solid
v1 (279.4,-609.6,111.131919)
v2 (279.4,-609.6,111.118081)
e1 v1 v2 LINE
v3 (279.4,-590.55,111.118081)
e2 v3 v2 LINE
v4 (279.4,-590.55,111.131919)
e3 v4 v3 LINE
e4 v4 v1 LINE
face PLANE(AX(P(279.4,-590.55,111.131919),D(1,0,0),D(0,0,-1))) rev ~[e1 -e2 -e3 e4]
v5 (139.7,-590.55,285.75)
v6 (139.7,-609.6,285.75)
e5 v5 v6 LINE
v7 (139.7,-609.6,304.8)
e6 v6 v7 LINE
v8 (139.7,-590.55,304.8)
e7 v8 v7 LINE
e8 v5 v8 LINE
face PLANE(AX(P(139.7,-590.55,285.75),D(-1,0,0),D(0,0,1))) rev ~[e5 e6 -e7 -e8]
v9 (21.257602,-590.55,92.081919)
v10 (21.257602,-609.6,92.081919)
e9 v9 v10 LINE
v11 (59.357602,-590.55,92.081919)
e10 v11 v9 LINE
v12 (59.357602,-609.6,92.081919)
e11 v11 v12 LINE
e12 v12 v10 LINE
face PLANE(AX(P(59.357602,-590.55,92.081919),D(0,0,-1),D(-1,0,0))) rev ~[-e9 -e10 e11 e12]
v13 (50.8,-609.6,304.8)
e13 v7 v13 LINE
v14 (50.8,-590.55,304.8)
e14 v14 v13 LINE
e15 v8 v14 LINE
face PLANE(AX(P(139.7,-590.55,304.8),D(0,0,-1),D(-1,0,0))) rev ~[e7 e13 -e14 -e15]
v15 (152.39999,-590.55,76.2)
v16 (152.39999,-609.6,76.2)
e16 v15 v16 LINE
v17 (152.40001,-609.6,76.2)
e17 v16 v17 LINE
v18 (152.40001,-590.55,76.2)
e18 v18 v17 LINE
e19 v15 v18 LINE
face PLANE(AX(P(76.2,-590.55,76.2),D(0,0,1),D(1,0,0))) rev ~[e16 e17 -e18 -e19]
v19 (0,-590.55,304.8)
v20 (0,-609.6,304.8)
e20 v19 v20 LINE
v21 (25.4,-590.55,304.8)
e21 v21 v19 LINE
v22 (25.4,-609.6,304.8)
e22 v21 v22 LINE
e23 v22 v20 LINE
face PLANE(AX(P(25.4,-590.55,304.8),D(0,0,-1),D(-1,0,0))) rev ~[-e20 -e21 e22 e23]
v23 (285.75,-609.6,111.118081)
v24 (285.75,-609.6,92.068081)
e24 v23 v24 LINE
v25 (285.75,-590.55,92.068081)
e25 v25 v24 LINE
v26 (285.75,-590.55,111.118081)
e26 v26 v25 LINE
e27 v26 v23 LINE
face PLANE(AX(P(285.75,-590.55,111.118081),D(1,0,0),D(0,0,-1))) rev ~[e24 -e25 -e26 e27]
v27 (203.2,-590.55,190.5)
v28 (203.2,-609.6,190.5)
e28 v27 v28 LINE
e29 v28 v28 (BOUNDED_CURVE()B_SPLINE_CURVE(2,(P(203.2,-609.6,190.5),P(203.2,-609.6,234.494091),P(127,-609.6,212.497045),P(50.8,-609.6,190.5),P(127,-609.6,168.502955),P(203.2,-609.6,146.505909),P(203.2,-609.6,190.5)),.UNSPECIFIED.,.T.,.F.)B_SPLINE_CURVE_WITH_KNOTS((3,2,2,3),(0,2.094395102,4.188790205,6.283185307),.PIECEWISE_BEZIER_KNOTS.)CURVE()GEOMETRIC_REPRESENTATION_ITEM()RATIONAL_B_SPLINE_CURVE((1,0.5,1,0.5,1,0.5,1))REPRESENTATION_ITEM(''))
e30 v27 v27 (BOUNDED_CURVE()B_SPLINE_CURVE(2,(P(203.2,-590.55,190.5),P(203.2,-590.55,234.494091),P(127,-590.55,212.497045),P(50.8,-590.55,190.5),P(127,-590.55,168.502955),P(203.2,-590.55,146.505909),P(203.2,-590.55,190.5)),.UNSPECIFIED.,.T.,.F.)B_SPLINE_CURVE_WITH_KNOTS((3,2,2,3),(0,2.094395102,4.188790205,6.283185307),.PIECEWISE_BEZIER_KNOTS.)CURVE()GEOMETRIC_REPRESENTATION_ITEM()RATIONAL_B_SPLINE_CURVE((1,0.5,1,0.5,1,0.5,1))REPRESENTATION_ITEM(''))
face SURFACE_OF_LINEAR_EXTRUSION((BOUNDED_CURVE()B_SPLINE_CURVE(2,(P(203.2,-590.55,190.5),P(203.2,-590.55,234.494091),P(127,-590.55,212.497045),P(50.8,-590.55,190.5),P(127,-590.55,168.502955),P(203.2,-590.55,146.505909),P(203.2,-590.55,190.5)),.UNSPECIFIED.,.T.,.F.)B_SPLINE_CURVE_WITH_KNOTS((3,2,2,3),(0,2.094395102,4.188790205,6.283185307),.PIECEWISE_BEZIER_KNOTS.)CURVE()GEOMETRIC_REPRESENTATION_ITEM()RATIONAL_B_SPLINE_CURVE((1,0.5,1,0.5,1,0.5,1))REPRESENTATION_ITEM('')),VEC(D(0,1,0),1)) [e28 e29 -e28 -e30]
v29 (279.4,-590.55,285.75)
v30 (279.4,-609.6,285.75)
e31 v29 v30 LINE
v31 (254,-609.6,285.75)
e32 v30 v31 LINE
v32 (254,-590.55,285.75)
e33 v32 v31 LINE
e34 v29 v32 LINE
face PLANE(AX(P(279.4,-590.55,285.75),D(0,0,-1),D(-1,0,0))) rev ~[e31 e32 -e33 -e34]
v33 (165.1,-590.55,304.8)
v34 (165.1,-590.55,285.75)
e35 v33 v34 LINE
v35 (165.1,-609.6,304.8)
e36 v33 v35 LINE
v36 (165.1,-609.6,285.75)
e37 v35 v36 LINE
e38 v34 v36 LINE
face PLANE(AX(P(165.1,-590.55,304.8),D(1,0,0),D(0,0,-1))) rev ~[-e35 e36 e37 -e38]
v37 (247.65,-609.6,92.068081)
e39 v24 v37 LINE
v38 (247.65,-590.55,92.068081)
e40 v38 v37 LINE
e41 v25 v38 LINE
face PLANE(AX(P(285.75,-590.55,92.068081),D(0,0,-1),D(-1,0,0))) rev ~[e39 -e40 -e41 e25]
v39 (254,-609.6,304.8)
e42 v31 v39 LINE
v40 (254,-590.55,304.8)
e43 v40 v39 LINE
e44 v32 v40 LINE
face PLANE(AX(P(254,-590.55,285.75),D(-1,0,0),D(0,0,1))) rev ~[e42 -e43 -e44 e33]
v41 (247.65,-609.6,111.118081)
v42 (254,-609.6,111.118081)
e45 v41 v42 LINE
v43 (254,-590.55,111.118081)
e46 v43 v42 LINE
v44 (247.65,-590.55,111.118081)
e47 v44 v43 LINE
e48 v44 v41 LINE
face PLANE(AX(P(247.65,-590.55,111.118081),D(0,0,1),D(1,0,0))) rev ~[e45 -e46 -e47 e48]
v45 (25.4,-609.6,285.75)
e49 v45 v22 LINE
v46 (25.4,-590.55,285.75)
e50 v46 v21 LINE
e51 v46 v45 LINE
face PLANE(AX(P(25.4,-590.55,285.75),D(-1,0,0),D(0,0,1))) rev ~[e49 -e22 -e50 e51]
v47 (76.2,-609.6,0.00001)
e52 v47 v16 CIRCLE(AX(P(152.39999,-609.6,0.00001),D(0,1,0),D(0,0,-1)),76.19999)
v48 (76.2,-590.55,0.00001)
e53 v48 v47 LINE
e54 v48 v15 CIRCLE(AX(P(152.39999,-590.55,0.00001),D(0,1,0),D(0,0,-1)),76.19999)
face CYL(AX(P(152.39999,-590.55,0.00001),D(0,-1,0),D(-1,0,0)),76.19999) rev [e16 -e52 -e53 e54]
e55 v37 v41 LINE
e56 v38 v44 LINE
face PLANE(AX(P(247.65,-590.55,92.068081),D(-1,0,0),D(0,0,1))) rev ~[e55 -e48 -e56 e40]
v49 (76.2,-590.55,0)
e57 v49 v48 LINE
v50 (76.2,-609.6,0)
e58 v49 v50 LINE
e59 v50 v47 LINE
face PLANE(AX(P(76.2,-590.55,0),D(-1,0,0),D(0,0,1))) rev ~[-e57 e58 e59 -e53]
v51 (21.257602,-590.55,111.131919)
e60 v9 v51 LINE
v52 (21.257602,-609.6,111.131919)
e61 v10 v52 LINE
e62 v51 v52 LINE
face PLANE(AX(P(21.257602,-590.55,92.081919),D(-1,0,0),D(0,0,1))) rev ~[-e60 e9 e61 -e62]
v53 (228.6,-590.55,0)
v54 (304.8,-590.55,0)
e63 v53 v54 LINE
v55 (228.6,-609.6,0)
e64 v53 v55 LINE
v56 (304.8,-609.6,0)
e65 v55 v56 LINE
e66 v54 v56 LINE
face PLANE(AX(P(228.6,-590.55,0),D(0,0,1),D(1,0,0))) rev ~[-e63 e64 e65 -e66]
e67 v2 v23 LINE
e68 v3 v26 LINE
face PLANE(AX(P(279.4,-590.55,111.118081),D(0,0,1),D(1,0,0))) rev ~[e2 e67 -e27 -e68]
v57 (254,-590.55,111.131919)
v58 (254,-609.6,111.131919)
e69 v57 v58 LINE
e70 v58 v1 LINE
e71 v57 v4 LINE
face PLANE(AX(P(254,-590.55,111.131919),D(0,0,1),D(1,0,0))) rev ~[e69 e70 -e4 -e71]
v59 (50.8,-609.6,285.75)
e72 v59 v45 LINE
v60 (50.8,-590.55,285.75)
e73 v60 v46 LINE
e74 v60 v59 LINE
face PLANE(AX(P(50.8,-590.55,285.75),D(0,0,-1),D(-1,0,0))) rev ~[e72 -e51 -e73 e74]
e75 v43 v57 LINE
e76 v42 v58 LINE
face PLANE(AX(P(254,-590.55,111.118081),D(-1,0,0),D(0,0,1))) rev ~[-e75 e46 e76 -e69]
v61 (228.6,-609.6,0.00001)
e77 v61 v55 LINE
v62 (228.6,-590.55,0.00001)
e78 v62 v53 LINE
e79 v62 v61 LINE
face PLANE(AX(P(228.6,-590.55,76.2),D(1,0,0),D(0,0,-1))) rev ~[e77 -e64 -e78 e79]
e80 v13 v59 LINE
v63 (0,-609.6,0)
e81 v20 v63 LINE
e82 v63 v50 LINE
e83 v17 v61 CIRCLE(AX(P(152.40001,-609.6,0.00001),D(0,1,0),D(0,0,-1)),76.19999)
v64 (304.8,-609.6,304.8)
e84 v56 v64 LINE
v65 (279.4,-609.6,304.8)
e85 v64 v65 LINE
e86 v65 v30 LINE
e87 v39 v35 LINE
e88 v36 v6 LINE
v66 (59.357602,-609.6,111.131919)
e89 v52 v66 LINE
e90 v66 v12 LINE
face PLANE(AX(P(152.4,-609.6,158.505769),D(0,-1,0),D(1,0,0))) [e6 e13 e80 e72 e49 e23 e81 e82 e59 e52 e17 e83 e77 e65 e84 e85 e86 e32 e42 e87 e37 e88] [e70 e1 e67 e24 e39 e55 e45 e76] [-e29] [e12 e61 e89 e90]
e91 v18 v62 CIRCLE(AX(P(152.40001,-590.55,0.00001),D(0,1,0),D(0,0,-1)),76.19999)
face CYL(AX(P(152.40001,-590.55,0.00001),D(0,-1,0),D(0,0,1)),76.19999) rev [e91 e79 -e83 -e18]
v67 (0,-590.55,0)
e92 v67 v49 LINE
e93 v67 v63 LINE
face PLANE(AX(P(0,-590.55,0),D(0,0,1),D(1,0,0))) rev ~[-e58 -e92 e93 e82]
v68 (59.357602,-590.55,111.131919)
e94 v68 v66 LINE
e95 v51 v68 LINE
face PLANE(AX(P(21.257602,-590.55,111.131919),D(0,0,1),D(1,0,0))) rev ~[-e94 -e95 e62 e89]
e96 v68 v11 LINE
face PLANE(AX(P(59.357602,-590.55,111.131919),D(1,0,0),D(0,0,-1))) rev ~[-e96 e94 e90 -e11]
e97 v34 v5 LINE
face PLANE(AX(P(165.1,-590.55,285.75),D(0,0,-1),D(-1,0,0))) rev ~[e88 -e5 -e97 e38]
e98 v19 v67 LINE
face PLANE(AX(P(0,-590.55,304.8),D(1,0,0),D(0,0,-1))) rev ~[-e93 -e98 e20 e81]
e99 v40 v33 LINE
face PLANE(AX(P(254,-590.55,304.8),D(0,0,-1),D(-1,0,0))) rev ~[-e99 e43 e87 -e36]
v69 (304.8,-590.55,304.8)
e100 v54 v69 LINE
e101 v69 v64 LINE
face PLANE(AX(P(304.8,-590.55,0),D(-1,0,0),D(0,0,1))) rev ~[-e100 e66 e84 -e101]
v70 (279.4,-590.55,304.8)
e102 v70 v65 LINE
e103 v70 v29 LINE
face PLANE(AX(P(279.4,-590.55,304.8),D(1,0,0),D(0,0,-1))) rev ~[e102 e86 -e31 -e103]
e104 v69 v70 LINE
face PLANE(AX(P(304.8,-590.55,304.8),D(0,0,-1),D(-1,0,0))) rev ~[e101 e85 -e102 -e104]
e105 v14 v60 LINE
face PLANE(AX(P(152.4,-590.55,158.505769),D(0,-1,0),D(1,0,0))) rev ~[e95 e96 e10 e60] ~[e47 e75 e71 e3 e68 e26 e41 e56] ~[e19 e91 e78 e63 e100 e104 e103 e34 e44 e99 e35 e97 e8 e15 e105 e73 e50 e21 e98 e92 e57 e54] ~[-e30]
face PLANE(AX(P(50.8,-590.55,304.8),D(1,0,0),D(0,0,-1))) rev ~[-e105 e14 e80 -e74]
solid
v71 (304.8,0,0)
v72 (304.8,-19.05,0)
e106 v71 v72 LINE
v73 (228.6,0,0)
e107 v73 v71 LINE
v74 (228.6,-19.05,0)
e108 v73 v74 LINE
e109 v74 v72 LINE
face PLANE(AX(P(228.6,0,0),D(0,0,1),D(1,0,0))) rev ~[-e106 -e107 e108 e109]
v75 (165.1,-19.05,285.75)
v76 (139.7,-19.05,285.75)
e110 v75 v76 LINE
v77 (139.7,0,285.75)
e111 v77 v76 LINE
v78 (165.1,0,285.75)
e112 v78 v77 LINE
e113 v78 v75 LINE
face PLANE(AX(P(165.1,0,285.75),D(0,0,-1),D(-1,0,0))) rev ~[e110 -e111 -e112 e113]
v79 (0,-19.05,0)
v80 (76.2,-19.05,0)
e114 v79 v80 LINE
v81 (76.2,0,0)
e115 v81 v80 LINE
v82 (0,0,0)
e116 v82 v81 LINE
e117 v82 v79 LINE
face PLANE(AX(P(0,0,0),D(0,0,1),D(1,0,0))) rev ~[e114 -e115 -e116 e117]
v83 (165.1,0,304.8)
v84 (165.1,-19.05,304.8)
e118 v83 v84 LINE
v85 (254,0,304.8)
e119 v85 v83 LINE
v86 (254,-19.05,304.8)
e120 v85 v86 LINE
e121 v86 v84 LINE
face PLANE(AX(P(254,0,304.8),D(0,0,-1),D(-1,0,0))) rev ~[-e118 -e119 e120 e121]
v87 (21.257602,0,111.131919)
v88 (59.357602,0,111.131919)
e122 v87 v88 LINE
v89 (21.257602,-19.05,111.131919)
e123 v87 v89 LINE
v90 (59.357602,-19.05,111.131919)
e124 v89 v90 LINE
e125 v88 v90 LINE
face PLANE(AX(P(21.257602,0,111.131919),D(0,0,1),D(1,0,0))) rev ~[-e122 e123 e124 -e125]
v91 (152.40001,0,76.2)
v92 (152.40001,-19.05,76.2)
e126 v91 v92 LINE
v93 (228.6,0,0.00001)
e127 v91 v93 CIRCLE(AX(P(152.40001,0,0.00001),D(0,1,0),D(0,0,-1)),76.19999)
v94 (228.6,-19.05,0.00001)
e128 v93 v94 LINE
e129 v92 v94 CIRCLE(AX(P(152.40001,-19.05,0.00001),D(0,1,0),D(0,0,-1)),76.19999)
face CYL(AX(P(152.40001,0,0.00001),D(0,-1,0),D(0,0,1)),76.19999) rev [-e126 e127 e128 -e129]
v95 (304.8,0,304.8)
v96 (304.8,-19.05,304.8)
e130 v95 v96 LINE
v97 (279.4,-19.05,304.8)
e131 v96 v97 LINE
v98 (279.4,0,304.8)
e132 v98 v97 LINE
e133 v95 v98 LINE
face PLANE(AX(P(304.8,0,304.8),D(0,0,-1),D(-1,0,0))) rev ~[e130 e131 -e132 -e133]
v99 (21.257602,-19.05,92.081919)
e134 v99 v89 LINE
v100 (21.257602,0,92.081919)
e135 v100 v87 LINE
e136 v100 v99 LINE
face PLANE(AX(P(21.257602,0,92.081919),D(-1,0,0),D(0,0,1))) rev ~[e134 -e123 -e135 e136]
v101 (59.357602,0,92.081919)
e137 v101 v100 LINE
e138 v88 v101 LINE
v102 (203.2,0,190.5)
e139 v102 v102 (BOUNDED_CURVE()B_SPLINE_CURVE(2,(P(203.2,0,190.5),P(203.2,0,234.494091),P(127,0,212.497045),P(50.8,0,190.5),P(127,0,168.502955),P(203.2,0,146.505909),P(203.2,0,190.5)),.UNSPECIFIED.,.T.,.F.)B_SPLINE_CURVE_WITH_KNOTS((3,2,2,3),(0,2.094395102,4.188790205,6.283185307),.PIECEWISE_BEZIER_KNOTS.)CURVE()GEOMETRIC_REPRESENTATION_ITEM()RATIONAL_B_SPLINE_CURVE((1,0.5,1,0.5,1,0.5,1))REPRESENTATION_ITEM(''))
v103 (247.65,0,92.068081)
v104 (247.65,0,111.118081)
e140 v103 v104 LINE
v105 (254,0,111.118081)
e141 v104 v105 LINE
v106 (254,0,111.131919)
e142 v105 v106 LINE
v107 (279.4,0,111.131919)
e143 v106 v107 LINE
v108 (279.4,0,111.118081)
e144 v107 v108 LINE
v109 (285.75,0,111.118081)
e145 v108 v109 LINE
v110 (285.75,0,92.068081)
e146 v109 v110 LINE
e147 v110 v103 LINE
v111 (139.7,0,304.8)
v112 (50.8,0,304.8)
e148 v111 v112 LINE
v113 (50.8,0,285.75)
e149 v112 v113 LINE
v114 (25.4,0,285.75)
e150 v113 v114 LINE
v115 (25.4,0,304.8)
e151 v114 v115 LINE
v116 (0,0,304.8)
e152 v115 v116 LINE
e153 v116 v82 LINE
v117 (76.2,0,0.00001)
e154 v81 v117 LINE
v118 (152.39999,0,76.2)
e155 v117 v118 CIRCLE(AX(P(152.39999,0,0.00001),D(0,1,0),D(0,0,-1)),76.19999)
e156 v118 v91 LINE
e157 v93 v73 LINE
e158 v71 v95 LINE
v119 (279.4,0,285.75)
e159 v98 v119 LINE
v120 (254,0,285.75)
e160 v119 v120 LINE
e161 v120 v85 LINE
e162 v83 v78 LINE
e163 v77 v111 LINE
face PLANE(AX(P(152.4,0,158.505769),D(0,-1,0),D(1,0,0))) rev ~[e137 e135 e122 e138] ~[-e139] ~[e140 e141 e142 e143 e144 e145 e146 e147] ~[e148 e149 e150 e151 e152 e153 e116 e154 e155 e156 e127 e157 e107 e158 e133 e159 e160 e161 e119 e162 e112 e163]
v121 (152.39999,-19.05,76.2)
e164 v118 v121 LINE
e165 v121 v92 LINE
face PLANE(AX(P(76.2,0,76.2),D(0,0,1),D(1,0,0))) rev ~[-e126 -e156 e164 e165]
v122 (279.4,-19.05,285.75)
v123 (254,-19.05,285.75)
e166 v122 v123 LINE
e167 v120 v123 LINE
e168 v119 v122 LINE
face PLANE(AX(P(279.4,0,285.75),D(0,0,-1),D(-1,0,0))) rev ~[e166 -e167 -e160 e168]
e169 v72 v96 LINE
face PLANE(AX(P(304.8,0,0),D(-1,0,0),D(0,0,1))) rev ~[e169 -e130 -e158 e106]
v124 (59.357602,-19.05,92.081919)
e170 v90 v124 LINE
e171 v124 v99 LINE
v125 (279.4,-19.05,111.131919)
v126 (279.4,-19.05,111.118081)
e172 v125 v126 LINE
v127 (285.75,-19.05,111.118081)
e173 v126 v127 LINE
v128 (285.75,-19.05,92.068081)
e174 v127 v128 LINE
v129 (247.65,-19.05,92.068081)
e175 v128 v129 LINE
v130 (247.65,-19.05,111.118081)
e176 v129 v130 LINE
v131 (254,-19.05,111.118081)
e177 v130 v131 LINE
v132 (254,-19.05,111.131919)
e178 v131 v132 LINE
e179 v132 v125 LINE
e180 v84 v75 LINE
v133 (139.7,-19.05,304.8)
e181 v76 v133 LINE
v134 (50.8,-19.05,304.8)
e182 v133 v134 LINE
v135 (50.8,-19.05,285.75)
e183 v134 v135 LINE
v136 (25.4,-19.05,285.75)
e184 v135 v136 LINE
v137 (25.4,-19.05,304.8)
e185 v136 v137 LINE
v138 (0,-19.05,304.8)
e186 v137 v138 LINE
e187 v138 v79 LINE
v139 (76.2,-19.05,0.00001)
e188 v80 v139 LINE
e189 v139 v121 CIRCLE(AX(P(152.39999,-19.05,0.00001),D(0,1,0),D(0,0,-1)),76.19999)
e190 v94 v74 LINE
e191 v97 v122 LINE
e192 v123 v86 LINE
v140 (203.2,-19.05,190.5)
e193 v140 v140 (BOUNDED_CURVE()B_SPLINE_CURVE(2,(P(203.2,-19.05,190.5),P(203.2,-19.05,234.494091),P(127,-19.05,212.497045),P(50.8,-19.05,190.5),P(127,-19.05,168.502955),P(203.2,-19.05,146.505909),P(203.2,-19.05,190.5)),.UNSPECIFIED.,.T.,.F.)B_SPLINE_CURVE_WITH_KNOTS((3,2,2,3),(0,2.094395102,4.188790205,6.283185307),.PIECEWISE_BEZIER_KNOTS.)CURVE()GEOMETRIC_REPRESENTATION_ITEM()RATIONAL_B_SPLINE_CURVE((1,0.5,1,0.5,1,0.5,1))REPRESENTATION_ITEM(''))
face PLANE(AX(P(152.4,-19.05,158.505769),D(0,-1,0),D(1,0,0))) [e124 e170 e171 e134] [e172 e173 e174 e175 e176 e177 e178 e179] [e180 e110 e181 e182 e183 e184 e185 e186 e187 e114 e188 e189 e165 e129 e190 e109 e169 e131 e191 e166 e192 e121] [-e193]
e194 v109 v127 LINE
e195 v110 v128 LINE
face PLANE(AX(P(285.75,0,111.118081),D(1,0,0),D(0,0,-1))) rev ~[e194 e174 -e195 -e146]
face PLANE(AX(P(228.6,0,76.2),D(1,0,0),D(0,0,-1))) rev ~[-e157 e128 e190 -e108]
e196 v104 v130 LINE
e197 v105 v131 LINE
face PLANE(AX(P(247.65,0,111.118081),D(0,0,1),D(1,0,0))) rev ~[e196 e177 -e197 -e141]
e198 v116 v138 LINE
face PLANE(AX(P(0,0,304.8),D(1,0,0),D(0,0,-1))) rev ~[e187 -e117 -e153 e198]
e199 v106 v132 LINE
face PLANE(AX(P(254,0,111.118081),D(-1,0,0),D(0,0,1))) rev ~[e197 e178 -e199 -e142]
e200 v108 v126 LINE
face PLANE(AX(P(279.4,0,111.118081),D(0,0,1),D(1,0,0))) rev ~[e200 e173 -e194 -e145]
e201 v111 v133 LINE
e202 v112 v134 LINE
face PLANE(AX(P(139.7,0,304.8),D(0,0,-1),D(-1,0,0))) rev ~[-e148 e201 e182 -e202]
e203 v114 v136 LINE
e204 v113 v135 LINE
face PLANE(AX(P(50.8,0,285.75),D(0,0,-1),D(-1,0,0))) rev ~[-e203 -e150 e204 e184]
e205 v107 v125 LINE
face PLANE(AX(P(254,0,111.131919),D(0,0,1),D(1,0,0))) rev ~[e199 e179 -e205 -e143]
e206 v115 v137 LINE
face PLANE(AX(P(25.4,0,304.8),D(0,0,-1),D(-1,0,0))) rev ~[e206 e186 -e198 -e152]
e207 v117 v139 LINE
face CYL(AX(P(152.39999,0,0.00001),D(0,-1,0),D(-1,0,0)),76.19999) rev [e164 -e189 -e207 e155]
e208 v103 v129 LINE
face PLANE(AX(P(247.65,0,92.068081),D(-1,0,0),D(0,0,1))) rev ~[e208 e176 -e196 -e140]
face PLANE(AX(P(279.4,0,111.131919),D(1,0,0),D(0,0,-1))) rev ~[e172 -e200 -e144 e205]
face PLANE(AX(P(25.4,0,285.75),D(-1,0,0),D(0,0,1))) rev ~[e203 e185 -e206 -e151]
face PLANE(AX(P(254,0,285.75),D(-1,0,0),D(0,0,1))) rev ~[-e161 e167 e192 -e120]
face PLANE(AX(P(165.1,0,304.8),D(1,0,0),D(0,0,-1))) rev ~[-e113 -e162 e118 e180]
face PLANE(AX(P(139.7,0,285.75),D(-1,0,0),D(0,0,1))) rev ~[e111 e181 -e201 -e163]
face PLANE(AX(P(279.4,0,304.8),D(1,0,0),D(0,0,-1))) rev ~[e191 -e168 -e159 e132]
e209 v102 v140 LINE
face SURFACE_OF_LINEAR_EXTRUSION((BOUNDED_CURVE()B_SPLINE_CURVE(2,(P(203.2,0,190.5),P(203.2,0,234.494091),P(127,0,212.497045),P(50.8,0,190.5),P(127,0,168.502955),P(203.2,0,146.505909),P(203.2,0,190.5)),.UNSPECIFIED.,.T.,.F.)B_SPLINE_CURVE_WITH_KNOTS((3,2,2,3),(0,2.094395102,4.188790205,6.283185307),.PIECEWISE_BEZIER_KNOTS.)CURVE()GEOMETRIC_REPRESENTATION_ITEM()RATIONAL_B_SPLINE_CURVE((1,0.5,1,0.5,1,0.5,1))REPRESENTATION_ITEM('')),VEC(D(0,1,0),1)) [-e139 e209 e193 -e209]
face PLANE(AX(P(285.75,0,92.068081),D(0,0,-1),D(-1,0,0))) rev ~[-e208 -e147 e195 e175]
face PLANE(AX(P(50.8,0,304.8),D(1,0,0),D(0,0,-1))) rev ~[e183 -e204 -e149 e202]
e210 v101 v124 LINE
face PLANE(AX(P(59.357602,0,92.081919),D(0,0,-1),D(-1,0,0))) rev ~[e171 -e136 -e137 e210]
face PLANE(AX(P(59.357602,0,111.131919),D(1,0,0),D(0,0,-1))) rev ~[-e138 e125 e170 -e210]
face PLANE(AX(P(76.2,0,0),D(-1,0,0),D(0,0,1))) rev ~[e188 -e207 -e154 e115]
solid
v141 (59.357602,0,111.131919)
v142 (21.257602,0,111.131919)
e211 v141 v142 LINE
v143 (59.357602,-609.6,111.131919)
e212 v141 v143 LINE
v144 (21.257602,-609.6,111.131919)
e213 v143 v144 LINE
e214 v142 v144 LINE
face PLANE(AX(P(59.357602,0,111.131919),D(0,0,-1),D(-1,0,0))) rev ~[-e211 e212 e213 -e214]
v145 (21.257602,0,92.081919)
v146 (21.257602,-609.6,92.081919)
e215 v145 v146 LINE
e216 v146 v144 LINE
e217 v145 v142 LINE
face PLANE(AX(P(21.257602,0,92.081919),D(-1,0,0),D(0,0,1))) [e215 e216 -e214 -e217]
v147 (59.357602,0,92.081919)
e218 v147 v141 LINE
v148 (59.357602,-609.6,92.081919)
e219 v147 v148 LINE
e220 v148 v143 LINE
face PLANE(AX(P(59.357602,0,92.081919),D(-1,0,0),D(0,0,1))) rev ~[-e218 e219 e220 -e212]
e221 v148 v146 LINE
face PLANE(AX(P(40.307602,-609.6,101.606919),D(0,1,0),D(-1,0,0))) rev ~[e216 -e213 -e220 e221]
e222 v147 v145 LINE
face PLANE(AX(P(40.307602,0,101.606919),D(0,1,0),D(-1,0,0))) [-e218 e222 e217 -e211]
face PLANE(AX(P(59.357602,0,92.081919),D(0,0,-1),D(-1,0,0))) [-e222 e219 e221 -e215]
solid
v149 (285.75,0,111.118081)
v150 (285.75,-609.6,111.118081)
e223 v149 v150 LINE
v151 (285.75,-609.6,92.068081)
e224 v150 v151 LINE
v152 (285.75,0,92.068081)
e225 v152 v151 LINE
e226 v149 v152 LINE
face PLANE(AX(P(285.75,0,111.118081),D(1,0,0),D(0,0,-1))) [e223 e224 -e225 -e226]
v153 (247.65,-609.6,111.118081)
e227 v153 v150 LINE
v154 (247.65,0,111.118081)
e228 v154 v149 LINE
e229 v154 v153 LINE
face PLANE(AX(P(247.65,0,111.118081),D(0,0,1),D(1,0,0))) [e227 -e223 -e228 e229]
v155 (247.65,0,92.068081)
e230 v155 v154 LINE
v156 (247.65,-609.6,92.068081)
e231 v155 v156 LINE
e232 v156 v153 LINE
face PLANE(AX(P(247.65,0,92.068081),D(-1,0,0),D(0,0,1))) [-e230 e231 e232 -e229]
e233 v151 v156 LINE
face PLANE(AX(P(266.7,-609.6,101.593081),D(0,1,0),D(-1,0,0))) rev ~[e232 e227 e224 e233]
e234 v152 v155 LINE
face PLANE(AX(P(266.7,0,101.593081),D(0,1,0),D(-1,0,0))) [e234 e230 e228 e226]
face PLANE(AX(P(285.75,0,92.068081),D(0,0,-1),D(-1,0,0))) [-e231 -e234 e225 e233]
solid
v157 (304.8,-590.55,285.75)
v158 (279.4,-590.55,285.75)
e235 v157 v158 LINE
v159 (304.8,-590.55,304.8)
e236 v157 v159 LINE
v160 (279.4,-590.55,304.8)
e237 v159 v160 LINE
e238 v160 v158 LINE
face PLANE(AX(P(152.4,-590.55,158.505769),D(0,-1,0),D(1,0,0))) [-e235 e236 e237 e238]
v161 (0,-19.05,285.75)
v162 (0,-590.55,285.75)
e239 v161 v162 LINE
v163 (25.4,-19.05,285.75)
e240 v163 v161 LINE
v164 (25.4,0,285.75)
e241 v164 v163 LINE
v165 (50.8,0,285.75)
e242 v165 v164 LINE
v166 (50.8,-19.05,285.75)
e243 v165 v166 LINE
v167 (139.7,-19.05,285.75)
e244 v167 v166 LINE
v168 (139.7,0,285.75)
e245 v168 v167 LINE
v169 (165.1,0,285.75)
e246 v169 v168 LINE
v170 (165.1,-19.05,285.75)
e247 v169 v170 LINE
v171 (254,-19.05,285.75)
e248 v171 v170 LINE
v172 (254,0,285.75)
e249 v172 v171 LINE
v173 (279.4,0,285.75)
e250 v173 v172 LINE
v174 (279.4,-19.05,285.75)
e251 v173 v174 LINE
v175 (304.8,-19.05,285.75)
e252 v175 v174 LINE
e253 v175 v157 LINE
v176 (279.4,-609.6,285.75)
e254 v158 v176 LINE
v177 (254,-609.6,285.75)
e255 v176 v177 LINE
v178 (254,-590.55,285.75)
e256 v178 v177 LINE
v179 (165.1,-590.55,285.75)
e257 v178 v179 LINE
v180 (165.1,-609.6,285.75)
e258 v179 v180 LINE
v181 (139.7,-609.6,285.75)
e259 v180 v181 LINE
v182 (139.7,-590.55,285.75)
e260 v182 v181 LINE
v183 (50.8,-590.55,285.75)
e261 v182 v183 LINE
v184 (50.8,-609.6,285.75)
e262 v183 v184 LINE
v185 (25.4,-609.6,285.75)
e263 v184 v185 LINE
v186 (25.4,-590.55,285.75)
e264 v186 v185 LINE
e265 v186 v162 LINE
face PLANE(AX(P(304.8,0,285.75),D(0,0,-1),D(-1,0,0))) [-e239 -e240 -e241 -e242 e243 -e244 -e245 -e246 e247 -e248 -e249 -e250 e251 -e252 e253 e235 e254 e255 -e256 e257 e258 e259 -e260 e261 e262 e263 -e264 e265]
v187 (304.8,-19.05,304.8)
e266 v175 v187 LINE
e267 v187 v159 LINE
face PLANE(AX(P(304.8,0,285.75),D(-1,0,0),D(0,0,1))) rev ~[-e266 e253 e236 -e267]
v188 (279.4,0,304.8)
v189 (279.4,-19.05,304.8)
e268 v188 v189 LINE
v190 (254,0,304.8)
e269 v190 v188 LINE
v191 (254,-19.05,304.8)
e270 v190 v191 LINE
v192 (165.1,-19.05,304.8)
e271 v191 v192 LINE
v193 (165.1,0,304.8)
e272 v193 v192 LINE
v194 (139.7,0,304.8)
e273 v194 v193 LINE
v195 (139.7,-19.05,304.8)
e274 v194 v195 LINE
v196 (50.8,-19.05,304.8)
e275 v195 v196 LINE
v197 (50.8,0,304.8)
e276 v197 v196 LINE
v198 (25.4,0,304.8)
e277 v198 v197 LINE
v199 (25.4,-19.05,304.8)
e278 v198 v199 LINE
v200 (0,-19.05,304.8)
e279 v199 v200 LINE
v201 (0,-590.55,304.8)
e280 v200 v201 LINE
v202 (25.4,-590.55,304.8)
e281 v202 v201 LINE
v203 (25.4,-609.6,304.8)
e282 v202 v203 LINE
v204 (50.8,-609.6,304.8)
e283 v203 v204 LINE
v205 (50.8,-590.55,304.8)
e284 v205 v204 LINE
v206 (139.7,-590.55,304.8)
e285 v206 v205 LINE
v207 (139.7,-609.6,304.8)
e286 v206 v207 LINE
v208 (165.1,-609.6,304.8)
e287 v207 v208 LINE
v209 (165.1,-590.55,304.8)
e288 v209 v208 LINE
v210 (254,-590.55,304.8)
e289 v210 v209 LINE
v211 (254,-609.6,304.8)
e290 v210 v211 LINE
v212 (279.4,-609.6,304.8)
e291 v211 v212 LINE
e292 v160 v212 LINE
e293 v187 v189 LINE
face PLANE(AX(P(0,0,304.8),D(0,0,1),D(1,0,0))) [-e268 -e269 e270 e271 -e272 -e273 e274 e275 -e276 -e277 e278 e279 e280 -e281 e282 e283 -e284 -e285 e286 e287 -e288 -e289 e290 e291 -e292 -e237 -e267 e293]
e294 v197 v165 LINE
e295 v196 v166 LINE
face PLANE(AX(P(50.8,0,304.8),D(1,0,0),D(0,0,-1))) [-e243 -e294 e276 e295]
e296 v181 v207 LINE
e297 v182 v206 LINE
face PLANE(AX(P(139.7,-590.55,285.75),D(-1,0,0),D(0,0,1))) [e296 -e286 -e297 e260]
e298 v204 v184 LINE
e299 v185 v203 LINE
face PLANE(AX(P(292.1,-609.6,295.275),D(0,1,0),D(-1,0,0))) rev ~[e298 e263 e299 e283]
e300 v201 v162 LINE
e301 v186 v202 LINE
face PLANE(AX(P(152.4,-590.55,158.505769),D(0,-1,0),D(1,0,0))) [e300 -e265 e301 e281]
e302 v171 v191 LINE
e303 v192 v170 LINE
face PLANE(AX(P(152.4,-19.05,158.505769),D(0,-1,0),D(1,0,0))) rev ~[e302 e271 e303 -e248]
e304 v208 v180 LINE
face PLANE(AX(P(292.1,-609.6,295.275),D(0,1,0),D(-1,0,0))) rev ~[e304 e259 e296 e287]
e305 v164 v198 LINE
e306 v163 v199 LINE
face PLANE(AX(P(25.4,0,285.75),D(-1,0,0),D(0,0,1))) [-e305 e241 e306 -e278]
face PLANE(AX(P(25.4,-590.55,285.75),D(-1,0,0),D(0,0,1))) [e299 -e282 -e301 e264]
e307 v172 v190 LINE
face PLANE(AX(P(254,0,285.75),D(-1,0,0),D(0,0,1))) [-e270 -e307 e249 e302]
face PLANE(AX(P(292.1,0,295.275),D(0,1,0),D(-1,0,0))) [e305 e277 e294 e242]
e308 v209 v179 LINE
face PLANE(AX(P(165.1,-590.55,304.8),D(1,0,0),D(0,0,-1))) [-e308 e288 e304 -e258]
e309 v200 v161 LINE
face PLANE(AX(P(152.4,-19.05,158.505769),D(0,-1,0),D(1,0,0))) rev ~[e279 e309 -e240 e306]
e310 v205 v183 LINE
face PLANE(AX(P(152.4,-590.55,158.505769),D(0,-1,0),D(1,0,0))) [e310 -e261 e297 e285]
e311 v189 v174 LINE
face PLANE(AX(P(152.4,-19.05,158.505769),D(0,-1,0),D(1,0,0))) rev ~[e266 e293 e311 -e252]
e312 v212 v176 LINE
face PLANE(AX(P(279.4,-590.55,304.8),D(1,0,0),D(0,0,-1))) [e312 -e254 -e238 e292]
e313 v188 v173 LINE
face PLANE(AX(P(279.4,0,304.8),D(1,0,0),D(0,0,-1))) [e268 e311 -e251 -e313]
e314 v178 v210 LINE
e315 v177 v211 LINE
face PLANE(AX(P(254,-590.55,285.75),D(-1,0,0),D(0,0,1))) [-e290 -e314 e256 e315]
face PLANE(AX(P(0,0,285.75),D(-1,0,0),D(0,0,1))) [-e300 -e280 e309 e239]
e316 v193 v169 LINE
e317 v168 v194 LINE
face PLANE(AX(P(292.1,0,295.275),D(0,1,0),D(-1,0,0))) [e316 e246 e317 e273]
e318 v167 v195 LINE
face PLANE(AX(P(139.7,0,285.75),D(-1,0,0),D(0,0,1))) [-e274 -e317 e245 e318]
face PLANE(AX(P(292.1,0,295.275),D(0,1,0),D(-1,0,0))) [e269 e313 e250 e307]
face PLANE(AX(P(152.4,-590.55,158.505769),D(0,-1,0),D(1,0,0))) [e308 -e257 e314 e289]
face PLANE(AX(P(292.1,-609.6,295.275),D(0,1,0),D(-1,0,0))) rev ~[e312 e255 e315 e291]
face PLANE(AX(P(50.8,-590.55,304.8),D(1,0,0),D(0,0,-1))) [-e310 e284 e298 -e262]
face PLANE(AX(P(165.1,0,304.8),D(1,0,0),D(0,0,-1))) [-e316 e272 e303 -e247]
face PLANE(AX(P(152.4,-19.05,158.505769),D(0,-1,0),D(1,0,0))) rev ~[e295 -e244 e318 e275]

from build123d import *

# Parameters (mm, degrees)
F1_DEPTH = 19.05
F2_W     = 25.4
F2_H     = 19.05
F2_W_2   = 88.9
F3_DEPTH = 609.6
F2_W_3   = 38.1
F5_R     = 76.19999
F5_2_R   = 76.19999


# Not quite as in the source:
# - a fillet or chamfer is up to 0.001 mm smaller than in the source, because OpenCascade refuses the exact size


with BuildPart() as f1:
    # F0 (on Front) → F1 (new body)
    with BuildSketch(Plane.XZ):
        Polygon((0, 304.8), (0, 0), (76.2, 0), (76.2, 76.2), (228.6, 76.2), (228.6, 0), (304.8, 0), (304.8, 304.8), (279.4, 304.8), (279.4, 285.75), (254, 285.75), (254, 304.8), (165.1, 304.8), (165.1, 285.75), (139.7, 285.75), (139.7, 304.8), (50.8, 304.8), (50.8, 285.75), (25.4, 285.75), (25.4, 304.8), align=None)
        Polygon((59.3576016784, 92.0819193125), (53.0076016784, 92.0819193125), (27.6076016784, 92.0819193125), (25.4, 92.0819193125), (21.2576016784, 92.0819193125), (21.2576016784, 111.1319193125), (27.6076016784, 111.1319193125), (53.0076016784, 111.1319193125), (59.3576016784, 111.1319193125), align=None, mode=Mode.SUBTRACT)
        Polygon((254, 111.1180806875), (254, 111.1319193125), (279.4, 111.1319193125), (279.4, 111.1180806875), (285.75, 111.1180806875), (285.75, 92.0680806875), (279.4, 92.0680806875), (254, 92.0680806875), (247.65, 92.0680806875), (247.65, 111.1180806875), align=None, mode=Mode.SUBTRACT)
        with BuildLine():
            add(Edge.make_bspline(
                [(203.2, 190.5), (203.2, 234.4940905122), (127, 212.4970452561), (50.8, 190.5), (127, 168.5029547439), (203.2, 146.5059094878), (203.2, 190.5)],
                knots=[0, 0, 0, 2.0943951024, 2.0943951024, 4.1887902048, 4.1887902048, 6.2831853072, 6.2831853072, 6.2831853072], degree=2, weights=[1, 0.5, 1, 0.5, 1, 0.5, 1]))
        make_face(mode=Mode.SUBTRACT)
    extrude(amount=F1_DEPTH)


with BuildPart() as f3:
    # F2 (on face) → F3 (new body)
    with BuildSketch(Plane(origin=(0, 0, 0), x_dir=(-1, 0, 0), z_dir=(0, 1, 0))):
        with Locations((-292.1, 295.275)):
            Rectangle(F2_W, F2_H)
        with Locations((-266.7, 295.275)):
            Rectangle(F2_W, F2_H)
        with Locations((-209.55, 295.275)):
            Rectangle(F2_W_2, F2_H)
        with Locations((-152.4, 295.275)):
            Rectangle(F2_W, F2_H)
        with Locations((-95.25, 295.275)):
            Rectangle(F2_W_2, F2_H)
        with Locations((-38.1, 295.275)):
            Rectangle(F2_W, F2_H)
        with Locations((-12.7, 295.275)):
            Rectangle(F2_W, F2_H)
    extrude(amount=-F3_DEPTH)


with BuildPart() as f3b:
    # F2 (on face) → F3, piece 2 (new body)
    with BuildSketch(Plane(origin=(0, 0, 0), x_dir=(-1, 0, 0), z_dir=(0, 1, 0))):
        with Locations((-40.3076016784, 101.6069193125)):
            Rectangle(F2_W_3, F2_H)
    extrude(amount=-F3_DEPTH)


with BuildPart() as f3c:
    # F2 (on face) → F3, piece 3 (new body)
    with BuildSketch(Plane(origin=(0, 0, 0), x_dir=(-1, 0, 0), z_dir=(0, 1, 0))):
        Polygon((-247.65, 92.0680806875), (-247.65, 111.1180806875), (-254, 111.1180806875), (-279.4, 111.1180806875), (-285.75, 111.1180806875), (-285.75, 92.0680806875), align=None)
    extrude(amount=-F3_DEPTH)


with BuildPart() as f4_1:
    # F4: copy of F1
    add(f1.part.moved(Location((0, -590.55, 0))))

    # F5#2 (radius 76.2 in the source; OpenCascade refuses exactly that, so slightly less here)
    f5_2_edges = [f4_1.edges().sort_by_distance(p)[0] for p in [
        (228.6, -600.075, 76.2),
        (76.2, -600.075, 76.2),
    ]]
    fillet(f5_2_edges, radius=F5_2_R)


with BuildPart() as f1_1:
    add(f1.part)

    # F5 (radius 76.2 in the source; OpenCascade refuses exactly that, so slightly less here)
    f5_edges = [f1_1.edges().sort_by_distance(p)[0] for p in [
        (76.2, -9.525, 76.2),
        (228.6, -9.525, 76.2),
    ]]
    fillet(f5_edges, radius=F5_R)


with BuildPart() as f3_1:
    add(f3.part)

    # F6: cut F4_1
    add(f4_1.part, mode=Mode.SUBTRACT)

    # F7: cut F1
    add(f1_1.part, mode=Mode.SUBTRACT)


solid = Compound([f3b.part, f3c.part, f4_1.part, f1_1.part, f3_1.part])
